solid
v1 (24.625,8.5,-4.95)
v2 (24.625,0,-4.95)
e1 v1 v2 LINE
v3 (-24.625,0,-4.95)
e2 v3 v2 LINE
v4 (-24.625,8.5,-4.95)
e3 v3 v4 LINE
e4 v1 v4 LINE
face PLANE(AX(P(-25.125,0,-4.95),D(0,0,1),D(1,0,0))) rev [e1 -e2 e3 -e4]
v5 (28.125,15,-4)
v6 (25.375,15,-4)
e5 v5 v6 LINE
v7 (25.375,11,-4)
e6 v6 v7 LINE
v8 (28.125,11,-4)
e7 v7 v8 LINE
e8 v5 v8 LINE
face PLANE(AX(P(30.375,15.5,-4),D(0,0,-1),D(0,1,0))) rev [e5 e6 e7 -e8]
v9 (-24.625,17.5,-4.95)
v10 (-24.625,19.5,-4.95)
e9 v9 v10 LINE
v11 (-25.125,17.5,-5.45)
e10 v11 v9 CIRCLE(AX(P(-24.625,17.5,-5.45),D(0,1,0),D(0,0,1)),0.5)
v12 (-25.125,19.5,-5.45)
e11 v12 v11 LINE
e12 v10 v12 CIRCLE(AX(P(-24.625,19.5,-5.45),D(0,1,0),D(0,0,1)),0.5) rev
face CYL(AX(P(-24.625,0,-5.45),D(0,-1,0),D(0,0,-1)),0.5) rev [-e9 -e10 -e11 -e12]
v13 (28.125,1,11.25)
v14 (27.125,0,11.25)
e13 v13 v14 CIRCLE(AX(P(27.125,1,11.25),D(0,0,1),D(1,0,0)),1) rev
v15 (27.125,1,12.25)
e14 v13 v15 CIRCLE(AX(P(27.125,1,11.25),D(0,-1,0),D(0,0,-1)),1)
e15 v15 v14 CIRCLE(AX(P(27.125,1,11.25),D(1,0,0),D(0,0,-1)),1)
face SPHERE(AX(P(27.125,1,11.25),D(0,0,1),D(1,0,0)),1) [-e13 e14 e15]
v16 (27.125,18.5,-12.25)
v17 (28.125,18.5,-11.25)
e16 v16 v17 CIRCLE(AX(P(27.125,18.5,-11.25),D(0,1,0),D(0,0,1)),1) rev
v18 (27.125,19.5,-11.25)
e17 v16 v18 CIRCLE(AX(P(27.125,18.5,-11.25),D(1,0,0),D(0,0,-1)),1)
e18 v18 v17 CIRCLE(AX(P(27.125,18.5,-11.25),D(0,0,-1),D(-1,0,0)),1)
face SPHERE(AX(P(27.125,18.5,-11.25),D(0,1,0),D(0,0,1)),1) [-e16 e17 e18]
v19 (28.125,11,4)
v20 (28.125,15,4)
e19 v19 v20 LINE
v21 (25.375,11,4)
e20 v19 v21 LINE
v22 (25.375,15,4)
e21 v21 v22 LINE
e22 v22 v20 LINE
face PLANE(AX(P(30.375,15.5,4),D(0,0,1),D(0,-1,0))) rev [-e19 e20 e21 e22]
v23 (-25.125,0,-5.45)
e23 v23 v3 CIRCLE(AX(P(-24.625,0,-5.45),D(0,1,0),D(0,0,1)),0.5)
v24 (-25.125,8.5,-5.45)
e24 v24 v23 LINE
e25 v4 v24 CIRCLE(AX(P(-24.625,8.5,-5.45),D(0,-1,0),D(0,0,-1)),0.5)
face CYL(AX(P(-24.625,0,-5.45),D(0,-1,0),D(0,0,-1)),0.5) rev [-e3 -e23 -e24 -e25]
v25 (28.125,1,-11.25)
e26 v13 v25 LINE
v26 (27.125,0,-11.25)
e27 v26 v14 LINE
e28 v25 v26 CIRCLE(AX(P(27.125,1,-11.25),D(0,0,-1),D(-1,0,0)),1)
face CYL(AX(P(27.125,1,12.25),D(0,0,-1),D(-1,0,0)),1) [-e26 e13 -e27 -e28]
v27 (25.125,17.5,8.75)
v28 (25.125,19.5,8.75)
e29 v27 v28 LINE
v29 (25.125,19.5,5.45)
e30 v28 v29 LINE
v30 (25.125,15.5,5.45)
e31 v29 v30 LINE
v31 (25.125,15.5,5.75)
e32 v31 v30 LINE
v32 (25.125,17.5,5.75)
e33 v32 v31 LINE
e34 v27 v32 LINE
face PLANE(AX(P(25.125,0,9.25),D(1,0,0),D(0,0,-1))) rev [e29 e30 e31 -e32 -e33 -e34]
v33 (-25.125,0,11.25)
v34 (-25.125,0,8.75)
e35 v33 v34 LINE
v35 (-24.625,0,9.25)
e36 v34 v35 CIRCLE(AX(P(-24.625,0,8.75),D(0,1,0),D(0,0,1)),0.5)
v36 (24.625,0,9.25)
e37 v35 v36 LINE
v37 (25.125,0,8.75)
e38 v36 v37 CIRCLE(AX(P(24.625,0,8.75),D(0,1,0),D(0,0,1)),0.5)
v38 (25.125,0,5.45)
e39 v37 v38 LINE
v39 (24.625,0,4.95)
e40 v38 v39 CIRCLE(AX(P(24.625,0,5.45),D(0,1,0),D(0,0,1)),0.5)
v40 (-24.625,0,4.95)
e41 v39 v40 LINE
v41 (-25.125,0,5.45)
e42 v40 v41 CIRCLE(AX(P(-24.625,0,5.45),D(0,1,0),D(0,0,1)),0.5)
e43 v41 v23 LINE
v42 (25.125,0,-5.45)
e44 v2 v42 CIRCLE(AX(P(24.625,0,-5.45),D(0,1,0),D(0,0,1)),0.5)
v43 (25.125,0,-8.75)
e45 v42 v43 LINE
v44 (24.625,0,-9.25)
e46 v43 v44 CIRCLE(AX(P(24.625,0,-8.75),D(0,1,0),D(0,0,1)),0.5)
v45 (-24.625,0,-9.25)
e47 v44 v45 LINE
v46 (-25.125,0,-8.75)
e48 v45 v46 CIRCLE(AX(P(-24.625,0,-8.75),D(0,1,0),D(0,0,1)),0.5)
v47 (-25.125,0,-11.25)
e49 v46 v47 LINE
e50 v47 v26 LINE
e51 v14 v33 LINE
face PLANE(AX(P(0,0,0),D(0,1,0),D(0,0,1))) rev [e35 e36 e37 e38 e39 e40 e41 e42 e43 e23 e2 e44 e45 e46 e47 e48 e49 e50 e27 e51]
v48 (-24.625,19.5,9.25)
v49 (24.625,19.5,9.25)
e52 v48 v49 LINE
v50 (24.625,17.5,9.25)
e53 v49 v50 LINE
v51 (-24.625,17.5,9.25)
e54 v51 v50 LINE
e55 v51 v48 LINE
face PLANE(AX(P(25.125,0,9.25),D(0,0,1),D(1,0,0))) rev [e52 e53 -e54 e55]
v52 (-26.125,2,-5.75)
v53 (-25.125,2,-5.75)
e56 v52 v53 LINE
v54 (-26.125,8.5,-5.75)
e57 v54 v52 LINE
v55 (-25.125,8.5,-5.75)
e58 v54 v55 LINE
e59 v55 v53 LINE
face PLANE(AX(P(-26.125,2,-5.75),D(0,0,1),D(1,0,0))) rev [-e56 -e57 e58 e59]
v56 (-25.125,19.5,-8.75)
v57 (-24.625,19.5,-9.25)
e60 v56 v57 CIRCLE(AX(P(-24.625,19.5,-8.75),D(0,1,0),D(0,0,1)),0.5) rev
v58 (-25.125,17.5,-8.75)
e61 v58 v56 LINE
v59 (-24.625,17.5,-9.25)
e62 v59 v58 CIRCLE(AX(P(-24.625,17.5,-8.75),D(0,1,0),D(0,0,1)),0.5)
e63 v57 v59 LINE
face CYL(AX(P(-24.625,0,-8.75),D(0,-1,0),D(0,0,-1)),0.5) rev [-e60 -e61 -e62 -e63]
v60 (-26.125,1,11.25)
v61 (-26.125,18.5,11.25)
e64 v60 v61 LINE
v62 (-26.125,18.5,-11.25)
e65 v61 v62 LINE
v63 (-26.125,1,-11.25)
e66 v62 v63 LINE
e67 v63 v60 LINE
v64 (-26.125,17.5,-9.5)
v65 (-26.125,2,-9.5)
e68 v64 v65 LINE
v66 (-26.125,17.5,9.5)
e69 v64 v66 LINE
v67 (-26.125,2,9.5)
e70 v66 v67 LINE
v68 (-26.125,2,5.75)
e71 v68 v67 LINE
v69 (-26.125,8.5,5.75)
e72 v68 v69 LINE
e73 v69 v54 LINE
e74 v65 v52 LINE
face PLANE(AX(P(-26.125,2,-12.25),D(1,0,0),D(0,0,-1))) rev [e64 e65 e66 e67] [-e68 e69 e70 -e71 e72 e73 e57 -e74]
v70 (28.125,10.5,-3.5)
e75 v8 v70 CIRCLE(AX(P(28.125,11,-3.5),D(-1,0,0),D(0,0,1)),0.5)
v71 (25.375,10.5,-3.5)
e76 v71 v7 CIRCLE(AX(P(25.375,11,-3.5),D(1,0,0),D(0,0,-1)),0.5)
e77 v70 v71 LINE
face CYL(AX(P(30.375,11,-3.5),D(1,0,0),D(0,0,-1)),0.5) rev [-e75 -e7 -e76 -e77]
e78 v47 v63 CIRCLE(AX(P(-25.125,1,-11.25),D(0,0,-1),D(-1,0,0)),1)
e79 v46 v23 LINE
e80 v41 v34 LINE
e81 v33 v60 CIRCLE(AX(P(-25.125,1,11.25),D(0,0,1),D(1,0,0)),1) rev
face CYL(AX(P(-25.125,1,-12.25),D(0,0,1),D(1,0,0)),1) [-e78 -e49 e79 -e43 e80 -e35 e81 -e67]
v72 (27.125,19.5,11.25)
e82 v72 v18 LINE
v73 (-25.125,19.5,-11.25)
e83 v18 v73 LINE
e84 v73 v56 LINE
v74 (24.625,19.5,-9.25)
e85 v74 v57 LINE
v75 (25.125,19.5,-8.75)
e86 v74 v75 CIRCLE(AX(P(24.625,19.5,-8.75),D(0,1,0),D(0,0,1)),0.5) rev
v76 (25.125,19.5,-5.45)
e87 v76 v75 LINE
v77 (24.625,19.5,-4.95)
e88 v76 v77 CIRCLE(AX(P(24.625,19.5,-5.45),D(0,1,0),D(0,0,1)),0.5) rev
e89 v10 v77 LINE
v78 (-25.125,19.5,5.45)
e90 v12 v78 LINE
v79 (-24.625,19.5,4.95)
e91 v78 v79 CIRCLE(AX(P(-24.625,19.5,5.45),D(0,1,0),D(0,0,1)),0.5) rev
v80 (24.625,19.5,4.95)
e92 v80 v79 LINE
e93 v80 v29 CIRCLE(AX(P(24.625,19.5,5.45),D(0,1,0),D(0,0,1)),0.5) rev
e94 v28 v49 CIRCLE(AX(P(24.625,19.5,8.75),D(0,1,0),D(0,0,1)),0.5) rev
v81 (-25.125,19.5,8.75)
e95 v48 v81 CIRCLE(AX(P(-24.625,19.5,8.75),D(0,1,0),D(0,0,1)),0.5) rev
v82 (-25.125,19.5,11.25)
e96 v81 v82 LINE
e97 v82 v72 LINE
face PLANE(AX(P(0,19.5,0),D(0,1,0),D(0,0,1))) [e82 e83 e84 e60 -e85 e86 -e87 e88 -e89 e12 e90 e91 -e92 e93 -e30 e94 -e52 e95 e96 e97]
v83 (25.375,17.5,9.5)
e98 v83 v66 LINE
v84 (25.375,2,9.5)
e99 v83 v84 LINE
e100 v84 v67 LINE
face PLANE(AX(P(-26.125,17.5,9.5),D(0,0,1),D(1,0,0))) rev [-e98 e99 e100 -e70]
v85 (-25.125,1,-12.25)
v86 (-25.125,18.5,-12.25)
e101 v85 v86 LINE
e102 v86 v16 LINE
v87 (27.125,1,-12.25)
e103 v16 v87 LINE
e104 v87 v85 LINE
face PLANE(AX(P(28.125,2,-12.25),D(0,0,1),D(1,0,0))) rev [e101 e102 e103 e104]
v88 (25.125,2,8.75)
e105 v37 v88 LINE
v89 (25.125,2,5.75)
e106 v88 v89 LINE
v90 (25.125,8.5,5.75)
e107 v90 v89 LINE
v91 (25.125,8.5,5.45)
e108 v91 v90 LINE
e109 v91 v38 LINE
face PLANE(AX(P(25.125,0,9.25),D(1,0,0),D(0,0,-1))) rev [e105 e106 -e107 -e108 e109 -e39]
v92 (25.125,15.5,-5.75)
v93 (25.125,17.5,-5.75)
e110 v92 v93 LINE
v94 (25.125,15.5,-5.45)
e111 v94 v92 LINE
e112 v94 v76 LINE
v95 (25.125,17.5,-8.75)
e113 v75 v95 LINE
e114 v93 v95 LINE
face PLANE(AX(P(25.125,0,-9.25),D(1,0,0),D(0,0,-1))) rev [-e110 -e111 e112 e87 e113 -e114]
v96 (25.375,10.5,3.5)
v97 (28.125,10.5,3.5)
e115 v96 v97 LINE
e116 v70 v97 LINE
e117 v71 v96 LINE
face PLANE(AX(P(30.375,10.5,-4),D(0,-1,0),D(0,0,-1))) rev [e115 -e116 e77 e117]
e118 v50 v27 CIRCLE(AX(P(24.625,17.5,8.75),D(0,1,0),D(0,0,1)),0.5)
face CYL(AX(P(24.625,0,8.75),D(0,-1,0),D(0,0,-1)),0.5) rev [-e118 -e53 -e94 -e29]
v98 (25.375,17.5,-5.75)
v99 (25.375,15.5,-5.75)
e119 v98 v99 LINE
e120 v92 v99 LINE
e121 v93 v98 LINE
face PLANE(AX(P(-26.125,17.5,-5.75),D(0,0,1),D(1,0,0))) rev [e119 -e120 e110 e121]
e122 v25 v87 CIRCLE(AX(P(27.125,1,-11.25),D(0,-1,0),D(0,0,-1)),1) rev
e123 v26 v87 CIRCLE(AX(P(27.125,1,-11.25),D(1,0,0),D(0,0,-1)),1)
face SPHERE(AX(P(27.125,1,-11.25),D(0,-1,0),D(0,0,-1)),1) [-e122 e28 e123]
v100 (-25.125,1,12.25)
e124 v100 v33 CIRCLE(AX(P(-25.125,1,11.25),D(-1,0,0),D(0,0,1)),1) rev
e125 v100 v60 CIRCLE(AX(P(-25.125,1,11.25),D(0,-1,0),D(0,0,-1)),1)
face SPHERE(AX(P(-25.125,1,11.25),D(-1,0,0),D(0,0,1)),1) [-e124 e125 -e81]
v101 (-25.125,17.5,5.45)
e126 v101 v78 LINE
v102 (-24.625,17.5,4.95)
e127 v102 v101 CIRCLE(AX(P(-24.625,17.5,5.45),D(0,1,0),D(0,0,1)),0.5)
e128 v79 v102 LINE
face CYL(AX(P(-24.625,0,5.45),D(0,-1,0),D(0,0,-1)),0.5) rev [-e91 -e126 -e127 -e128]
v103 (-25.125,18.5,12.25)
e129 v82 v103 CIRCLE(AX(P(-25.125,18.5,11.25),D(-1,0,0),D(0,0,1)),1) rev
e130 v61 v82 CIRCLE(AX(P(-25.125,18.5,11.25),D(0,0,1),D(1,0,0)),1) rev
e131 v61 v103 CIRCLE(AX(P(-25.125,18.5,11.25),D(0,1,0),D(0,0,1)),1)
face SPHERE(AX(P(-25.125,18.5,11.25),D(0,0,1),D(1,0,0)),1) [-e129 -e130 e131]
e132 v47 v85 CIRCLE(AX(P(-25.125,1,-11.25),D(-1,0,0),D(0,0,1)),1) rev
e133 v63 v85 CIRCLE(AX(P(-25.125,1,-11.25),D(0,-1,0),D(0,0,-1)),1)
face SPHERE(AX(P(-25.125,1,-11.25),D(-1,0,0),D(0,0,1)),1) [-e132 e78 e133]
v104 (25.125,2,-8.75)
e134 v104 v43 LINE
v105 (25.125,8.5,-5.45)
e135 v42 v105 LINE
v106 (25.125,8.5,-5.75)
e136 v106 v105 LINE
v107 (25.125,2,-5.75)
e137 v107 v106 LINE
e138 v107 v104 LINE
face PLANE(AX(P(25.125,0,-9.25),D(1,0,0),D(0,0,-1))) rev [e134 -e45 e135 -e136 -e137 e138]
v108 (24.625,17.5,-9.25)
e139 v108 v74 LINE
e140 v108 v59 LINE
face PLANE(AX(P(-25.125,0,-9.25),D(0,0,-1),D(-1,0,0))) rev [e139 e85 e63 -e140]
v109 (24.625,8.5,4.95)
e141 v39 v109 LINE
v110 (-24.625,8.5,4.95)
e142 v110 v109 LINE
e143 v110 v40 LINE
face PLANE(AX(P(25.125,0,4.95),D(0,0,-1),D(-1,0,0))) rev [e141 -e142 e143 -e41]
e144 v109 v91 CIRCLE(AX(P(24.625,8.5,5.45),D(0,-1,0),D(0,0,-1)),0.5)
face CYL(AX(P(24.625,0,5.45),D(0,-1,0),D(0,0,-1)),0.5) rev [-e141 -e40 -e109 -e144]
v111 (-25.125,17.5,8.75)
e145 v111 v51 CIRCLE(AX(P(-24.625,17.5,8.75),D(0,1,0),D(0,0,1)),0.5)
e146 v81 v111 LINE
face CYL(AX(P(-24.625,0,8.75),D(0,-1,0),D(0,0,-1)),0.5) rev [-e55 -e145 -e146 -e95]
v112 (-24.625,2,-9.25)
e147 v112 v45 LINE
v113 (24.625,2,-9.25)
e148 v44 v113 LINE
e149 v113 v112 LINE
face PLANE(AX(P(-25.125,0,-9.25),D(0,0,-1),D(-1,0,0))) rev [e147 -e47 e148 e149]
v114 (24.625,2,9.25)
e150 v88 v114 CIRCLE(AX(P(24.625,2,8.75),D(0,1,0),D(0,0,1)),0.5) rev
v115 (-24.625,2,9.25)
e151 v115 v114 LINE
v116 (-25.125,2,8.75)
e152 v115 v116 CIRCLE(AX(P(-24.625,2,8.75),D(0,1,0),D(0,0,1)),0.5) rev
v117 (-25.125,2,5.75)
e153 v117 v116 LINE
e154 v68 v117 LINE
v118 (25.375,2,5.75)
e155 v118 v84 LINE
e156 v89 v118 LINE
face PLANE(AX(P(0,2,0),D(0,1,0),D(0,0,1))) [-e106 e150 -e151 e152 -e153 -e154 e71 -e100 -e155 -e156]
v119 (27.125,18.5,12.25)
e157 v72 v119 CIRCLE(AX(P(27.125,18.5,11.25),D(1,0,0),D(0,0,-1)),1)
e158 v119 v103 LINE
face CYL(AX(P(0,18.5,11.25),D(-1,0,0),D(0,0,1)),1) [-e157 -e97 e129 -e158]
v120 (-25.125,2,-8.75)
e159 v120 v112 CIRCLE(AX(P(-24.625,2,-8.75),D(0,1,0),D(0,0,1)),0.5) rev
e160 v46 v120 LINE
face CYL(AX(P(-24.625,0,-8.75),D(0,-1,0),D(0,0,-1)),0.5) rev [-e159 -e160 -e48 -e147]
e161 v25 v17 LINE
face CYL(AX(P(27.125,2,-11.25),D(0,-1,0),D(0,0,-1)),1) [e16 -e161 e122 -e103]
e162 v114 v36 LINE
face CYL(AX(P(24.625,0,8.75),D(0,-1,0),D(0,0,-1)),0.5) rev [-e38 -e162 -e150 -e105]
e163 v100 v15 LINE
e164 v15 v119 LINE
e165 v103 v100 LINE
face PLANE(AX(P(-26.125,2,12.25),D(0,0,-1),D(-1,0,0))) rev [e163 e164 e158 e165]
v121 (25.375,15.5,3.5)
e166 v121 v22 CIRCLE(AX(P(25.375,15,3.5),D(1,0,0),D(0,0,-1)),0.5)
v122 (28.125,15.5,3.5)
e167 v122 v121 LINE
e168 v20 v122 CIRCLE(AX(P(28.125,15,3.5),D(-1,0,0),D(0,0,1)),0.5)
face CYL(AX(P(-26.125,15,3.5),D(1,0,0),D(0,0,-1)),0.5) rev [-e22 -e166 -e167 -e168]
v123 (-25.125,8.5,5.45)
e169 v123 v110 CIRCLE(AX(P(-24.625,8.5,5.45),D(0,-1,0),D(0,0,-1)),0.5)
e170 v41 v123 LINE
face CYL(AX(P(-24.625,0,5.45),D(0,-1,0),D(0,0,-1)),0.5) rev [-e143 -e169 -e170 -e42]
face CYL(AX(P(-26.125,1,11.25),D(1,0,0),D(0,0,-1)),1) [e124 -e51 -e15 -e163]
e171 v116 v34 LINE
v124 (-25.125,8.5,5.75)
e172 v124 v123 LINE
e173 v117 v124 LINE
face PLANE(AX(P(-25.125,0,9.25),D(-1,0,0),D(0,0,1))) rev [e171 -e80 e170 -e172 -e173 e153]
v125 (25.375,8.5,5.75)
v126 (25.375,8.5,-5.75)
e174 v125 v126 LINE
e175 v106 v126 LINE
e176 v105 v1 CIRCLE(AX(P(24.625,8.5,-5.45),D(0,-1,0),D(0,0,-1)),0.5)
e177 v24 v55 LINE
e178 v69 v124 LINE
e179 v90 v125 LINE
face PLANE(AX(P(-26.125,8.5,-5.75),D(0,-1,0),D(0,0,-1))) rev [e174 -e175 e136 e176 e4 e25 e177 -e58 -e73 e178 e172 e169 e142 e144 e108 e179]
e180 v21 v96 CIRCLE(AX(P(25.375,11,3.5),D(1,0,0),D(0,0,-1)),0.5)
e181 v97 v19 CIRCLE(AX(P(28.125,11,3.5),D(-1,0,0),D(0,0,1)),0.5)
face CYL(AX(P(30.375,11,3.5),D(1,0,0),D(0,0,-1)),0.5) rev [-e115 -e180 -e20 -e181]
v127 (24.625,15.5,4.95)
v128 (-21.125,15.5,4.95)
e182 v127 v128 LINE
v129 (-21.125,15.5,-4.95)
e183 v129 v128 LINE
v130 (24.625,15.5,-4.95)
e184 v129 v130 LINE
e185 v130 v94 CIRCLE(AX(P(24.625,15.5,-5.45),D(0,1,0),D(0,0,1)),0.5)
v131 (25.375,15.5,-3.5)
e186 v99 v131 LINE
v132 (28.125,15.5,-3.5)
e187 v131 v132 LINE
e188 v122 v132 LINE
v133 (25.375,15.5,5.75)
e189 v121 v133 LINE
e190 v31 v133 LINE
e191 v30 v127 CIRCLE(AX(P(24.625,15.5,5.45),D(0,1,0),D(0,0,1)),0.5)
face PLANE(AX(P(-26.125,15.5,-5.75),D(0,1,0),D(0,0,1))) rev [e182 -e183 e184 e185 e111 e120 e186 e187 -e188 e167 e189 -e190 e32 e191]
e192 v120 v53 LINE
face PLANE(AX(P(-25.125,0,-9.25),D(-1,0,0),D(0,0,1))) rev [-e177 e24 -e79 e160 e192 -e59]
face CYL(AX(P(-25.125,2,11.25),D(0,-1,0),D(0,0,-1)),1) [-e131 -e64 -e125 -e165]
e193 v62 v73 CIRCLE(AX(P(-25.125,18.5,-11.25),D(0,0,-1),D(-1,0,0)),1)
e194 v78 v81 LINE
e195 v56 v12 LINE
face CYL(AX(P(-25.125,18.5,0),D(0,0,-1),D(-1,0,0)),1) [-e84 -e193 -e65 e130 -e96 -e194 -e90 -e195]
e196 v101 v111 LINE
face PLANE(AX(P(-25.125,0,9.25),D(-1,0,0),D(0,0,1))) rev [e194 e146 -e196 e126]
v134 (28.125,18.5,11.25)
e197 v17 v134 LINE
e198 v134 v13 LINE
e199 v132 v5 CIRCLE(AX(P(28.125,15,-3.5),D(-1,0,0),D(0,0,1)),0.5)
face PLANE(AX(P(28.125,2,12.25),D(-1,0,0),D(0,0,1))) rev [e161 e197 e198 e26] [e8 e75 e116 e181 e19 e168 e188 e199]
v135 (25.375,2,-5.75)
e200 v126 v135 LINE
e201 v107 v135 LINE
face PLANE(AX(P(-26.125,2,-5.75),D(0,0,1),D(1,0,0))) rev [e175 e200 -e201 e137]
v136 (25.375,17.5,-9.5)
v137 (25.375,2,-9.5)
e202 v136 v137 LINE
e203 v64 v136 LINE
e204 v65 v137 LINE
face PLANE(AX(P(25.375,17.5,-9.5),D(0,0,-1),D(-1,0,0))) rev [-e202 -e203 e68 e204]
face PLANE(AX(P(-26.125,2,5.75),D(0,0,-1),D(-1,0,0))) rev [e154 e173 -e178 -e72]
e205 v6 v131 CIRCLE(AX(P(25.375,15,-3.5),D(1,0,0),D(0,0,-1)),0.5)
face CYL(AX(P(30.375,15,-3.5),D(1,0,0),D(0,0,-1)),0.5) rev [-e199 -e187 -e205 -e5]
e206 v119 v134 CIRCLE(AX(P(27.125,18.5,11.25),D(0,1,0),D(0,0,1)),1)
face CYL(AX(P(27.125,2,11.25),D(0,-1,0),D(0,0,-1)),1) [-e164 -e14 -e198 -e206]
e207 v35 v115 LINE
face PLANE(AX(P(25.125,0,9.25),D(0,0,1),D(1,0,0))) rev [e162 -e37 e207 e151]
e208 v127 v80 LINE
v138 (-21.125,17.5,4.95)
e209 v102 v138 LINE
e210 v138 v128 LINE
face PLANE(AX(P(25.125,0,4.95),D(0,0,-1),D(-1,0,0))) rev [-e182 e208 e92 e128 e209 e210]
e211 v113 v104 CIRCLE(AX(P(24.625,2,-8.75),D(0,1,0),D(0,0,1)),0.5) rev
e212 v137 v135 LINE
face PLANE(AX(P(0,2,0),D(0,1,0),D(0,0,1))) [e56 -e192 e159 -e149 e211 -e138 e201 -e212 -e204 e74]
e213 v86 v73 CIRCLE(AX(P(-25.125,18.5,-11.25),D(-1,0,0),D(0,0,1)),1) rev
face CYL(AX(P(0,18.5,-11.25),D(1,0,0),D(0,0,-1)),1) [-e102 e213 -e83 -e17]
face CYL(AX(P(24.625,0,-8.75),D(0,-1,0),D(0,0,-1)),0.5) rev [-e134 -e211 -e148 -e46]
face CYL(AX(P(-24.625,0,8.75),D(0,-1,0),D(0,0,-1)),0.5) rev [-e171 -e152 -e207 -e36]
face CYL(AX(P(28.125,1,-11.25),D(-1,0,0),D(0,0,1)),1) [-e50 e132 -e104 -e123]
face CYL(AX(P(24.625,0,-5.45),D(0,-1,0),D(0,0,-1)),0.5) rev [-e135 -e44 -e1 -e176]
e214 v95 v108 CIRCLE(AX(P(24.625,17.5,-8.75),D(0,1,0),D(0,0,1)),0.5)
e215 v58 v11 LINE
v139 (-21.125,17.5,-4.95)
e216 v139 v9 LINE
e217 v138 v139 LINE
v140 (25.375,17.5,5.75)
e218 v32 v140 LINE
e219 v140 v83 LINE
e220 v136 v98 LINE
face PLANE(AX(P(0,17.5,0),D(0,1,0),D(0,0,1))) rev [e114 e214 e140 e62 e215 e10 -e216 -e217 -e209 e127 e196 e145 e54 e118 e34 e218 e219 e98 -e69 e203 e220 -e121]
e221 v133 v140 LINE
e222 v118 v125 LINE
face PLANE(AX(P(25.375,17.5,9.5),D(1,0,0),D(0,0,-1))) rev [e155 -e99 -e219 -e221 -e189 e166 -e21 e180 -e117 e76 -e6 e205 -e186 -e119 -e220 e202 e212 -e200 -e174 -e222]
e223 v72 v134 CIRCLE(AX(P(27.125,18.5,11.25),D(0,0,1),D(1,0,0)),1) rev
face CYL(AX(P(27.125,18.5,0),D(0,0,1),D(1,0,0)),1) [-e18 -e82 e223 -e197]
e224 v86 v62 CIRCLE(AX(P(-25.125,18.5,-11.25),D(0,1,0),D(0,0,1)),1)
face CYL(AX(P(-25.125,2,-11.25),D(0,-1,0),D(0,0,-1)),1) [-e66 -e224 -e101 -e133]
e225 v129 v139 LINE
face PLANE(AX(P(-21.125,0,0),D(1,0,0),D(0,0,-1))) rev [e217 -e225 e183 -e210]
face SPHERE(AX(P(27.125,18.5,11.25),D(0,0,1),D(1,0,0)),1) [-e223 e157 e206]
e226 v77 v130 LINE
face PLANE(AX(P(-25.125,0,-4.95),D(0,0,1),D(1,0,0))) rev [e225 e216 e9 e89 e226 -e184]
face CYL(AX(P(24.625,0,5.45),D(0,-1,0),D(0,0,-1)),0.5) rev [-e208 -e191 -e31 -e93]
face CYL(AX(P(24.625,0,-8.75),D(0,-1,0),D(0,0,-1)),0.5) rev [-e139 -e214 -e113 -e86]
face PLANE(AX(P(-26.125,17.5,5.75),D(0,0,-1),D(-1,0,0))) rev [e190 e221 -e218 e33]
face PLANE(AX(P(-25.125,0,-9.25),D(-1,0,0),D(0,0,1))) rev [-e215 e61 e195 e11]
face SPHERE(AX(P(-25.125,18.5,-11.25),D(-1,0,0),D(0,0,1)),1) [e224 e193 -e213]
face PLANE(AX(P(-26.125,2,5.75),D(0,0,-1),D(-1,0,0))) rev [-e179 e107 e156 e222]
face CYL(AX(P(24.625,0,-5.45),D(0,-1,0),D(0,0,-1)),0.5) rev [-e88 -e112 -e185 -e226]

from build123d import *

# Parameters (mm, degrees)
SKETCH2_W           = 54.25
SKETCH2_H           = 24.5
BOSS_EXTRUDE1_DEPTH = 2
BOSS_EXTRUDE2_DEPTH = 15.5
SKETCH5_W           = 54.25
SKETCH5_H           = 24.5
BOSS_EXTRUDE3_DEPTH = 2
SKETCH6_W           = 11.5
SKETCH6_H           = 6.5
SKETCH6_H_2         = 2
BOSS_EXTRUDE4_DEPTH = 51.5
SKETCH8_W           = 50.25
SKETCH8_H           = 4.3
CUT_EXTRUDE1_DEPTH  = 37.350077373
SKETCH9_W           = 11.5
SKETCH9_H           = 2
CUT_EXTRUDE2_DEPTH  = 5
SKETCH10_W          = 8
SKETCH10_H          = 5
CUT_EXTRUDE3_DEPTH  = 5
FILLET1_R           = 0.5
FILLET2_R           = 1


with BuildPart() as part:
    # Sketch2 → Boss-Extrude1 (new body)
    with BuildSketch(Plane(origin=(0, 0, 0), x_dir=(1, 0, 0), z_dir=(0, 1, 0))):
        with Locations((1, 0)):
            Rectangle(SKETCH2_W, SKETCH2_H)
    extrude(amount=BOSS_EXTRUDE1_DEPTH)

    # Sketch3 → Boss-Extrude2 (add)
    with BuildSketch(Plane(origin=(0, 2, 0), x_dir=(1, 0, 0), z_dir=(0, 1, 0))):
        Polygon((-26.125, 12.25), (28.125, 12.25), (28.125, -12.25), (-26.125, -12.25), (-26.125, -9.5), (25.375, -9.5), (25.375, 9.5), (-26.125, 9.5), align=None)
    extrude(amount=BOSS_EXTRUDE2_DEPTH)

    # Sketch5 → Boss-Extrude3 (add)
    with BuildSketch(Plane(origin=(0, 17.5, 0), x_dir=(1, 0, 0), z_dir=(0, 1, 0))):
        with Locations((1, 0)):
            Rectangle(SKETCH5_W, SKETCH5_H)
    extrude(amount=BOSS_EXTRUDE3_DEPTH)

    # Sketch6 → Boss-Extrude4 (add)
    with BuildSketch(Plane.ZY.offset(-25.375)):
        with Locations((0, 5.25)):
            Rectangle(SKETCH6_W, SKETCH6_H)
        with Locations((0, 16.5)):
            Rectangle(SKETCH6_W, SKETCH6_H_2)
    extrude(amount=BOSS_EXTRUDE4_DEPTH)

    # Sketch8 → Cut-Extrude1 (cut, through all)
    with BuildSketch(Plane(origin=(0, 19.5, 0), x_dir=(1, 0, 0), z_dir=(0, 1, 0))):
        with Locations((0, 7.1)):
            Rectangle(SKETCH8_W, SKETCH8_H)
        with Locations((0, -7.1)):
            Rectangle(SKETCH8_W, SKETCH8_H)
    extrude(amount=-CUT_EXTRUDE1_DEPTH, mode=Mode.SUBTRACT)

    # Sketch9 → Cut-Extrude2 (cut)
    with BuildSketch(Plane.ZY.offset(26.125)):
        with Locations((0, 16.5)):
            Rectangle(SKETCH9_W, SKETCH9_H)
    extrude(amount=-CUT_EXTRUDE2_DEPTH, mode=Mode.SUBTRACT)

    # Sketch10 → Cut-Extrude3 (cut)
    with BuildSketch(Plane.ZY.offset(-25.375)):
        with Locations((0, 13)):
            Rectangle(SKETCH10_W, SKETCH10_H)
    extrude(amount=-CUT_EXTRUDE3_DEPTH, mode=Mode.SUBTRACT)

    # Fillet1
    fillet1_edges = [part.edges().sort_by_distance(p)[0] for p in [
        (-25.125, 18.5, -9.25),
        (25.125, 18.5, -9.25),
        (25.125, 4.25, -4.95),
        (25.125, 17.5, -4.95),
        (-25.125, 4.25, -4.95),
        (-25.125, 1, -9.25),
        (25.125, 1, -9.25),
        (25.125, 18.5, 9.25),
        (-25.125, 4.25, 4.95),
        (25.125, 17.5, 4.95),
        (-25.125, 18.5, 9.25),
        (25.125, 4.25, 4.95),
        (25.125, 1, 9.25),
        (-25.125, 1, 9.25),
        (-25.125, 18.5, -4.95),
        (-25.125, 18.5, 4.95),
        (26.75, 10.5, -4),
        (26.75, 15.5, -4),
        (26.75, 15.5, 4),
        (26.75, 10.5, 4),
    ]]
    fillet(fillet1_edges, radius=FILLET1_R)

    # Fillet2
    fillet2_edges = [part.edges().sort_by_distance(p)[0] for p in [
        (-26.125, 19.5, 0),
        (1, 19.5, 12.25),
        (28.125, 19.5, 0),
        (1, 19.5, -12.25),
        (28.125, 0, 0),
        (1, 0, 12.25),
        (-26.125, 0, 0),
        (1, 0, -12.25),
        (28.125, 9.75, -12.25),
        (28.125, 9.75, 12.25),
        (-26.125, 9.75, 12.25),
        (-26.125, 9.75, -12.25),
    ]]
    fillet(fillet2_edges, radius=FILLET2_R - 0.0001)  # a hair under: the kernel refuses the full size


solid = part.part
